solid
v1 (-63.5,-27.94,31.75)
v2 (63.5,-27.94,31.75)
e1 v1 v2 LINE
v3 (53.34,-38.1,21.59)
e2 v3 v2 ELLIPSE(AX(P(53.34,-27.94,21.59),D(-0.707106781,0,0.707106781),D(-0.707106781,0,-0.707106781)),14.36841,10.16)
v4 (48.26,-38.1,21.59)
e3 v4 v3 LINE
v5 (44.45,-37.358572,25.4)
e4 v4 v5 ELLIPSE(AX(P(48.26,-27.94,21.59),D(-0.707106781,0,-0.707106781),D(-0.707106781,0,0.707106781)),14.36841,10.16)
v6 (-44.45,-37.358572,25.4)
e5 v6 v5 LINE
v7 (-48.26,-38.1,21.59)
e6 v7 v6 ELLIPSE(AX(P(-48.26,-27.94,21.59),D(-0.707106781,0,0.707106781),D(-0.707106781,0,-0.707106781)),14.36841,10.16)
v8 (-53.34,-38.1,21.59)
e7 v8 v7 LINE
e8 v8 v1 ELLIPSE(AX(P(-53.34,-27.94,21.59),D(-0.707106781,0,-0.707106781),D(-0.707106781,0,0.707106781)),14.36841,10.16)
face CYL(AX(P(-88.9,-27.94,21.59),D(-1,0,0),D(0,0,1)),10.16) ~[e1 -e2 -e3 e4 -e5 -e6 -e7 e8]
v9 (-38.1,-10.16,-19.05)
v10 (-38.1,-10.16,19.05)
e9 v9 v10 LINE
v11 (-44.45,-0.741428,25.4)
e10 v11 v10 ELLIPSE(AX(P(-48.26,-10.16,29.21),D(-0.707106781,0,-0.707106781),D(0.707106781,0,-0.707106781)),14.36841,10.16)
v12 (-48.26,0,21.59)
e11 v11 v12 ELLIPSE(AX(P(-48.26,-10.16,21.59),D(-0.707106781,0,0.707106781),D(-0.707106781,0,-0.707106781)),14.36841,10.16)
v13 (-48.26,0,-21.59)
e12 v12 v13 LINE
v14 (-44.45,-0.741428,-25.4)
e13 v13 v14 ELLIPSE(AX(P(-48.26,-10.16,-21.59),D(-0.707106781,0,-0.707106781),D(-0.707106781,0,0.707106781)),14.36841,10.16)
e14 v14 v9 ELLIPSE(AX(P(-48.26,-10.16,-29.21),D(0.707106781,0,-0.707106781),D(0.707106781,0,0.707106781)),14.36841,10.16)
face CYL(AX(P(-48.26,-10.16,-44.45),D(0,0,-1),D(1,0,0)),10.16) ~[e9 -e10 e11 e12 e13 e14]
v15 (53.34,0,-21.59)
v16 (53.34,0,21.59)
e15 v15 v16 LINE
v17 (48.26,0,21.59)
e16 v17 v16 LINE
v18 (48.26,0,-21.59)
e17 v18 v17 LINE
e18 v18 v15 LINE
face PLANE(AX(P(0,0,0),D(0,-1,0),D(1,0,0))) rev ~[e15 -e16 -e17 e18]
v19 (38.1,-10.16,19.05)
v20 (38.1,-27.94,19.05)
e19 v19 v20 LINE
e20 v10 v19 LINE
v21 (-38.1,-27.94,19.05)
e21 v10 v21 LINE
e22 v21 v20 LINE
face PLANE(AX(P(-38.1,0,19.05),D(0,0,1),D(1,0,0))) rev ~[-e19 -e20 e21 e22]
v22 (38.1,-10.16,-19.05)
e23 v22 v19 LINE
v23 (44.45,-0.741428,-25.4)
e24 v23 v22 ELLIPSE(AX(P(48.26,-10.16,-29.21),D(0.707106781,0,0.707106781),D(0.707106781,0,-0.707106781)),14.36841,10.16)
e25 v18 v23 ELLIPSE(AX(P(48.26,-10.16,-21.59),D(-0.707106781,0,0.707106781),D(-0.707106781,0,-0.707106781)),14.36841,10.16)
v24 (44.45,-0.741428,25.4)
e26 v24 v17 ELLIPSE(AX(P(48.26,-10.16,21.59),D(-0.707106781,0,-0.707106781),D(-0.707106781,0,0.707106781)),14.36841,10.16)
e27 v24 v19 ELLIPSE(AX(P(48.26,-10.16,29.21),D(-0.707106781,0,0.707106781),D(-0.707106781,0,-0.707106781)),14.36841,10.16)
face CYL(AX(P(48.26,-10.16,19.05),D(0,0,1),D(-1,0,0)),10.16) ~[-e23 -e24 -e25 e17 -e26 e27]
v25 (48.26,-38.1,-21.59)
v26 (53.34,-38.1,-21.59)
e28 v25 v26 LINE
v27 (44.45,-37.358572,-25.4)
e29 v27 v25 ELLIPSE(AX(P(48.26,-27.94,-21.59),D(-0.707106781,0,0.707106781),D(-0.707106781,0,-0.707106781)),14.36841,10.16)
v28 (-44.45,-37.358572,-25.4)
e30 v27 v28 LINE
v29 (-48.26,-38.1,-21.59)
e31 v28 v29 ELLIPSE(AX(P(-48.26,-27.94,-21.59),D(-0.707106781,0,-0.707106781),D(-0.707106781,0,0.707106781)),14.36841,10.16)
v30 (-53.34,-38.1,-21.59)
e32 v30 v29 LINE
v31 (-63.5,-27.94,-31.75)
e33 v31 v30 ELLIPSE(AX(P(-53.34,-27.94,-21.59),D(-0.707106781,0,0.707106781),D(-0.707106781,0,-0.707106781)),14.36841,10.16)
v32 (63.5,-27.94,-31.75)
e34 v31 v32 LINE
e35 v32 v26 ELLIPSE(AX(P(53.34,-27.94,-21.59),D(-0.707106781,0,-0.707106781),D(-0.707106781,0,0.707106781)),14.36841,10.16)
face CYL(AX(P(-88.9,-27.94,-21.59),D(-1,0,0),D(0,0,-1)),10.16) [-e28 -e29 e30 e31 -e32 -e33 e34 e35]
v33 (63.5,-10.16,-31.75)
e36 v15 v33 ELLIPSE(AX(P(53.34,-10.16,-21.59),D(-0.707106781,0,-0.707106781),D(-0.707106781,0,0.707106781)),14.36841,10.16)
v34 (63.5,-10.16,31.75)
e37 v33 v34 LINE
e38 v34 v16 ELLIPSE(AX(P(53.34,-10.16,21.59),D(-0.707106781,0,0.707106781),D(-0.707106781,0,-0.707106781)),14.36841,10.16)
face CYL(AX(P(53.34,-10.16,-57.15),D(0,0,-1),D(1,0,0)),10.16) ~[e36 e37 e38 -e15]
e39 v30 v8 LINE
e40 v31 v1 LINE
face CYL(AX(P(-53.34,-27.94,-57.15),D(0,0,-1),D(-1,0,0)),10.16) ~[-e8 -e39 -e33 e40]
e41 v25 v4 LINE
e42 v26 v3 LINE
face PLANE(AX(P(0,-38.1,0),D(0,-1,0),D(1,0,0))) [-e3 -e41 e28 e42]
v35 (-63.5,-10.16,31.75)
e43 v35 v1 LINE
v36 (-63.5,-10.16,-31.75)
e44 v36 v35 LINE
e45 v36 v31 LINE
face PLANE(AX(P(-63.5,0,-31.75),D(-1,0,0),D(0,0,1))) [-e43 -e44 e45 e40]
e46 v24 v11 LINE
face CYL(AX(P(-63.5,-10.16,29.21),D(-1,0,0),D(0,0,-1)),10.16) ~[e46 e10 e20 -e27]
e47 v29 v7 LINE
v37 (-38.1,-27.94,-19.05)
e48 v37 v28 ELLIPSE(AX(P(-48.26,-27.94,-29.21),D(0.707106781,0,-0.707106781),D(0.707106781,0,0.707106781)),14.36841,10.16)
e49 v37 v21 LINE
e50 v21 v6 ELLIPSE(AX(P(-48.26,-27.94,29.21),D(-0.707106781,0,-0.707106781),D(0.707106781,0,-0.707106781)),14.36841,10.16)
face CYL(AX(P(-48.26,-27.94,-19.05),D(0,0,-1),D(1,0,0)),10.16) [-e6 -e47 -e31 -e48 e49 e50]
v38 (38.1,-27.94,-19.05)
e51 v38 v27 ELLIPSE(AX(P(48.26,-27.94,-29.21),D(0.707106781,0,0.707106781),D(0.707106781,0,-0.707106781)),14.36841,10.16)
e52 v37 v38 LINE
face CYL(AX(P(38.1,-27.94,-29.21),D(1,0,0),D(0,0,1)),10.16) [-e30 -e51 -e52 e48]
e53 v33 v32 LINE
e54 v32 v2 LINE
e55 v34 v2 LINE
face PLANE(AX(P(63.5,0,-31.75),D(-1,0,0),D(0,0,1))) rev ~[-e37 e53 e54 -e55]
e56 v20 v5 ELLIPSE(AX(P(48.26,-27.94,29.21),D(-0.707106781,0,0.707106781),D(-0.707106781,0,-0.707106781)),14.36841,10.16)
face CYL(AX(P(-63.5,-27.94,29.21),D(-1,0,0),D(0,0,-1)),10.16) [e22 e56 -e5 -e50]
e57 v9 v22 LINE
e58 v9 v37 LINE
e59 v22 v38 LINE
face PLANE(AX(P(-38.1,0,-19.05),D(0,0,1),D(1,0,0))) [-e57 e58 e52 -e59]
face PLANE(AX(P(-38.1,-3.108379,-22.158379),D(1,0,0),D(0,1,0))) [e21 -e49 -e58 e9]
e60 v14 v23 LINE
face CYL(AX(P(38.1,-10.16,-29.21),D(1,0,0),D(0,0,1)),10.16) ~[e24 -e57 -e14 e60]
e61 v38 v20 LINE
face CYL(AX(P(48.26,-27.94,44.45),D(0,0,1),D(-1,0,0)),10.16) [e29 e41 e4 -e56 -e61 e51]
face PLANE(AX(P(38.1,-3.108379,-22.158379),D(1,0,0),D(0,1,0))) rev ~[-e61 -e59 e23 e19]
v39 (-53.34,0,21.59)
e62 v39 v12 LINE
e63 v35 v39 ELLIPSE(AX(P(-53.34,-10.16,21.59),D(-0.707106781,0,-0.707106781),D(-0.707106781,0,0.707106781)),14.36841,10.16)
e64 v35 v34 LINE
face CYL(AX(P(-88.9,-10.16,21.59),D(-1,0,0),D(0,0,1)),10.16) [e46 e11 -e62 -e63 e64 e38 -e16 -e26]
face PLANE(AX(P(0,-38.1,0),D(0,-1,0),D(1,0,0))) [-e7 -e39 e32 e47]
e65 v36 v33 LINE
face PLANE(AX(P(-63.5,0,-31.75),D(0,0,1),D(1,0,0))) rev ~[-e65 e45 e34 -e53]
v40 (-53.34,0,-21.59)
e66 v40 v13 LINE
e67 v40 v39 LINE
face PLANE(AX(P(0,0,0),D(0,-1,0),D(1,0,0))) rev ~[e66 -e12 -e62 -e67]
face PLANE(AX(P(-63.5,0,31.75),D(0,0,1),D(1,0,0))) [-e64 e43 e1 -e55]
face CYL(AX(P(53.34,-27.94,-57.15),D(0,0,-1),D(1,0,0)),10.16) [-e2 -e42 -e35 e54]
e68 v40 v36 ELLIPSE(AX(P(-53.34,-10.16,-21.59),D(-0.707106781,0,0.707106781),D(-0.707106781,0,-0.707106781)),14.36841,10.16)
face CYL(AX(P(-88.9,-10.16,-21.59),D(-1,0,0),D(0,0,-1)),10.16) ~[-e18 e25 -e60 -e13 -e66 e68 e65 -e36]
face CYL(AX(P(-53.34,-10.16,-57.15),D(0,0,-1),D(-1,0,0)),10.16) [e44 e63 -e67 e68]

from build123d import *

# Parameters (mm, degrees)
F0_W          = 127
F0_H          = 63.5
F0_W_2        = 76.2
F0_H_2        = 38.1
F1_DEPTH      = 38.1
F2_T1_DEPTH   = 177.8
F2_T3_DEPTH   = 114.3
F2_T5_DEPTH   = 76.2
F2_T7_DEPTH   = 38.1
F2_T13_DEPTH  = 101.6
F2_T17_DEPTH  = 63.5
F2_T25_DEPTH  = 101.6
F2_T29_DEPTH  = 63.5
F2_T37_DEPTH  = 63.5
F2_T42_DEPTH  = 101.6
F2_T49_DEPTH  = 101.6
F2_T53_DEPTH  = 63.5
F2_T61_DEPTH  = 101.6
F2_T65_DEPTH  = 63.5
F2_T73_DEPTH  = 101.6
F2_T77_DEPTH  = 63.5
F2_T85_DEPTH  = 63.5
F2_T90_DEPTH  = 101.6
F2_T97_DEPTH  = 101.6
F2_T101_DEPTH = 63.5


# Not quite as in the source:
# - a fillet or chamfer that OpenCascade refuses, or shapes differently, is made with other operations: its cross-section is extruded or revolved along the edge and cut away or added


with BuildPart() as f1:
    # F0 (on Front) → F1 (new body)
    with BuildSketch(Plane.XZ):
        Rectangle(F0_W, F0_H)
        Rectangle(F0_W_2, F0_H_2, mode=Mode.SUBTRACT)
    extrude(amount=F1_DEPTH)

    # F2: fillet of radius 10.16 on 16 edges, made by hand

    # F2_s2 → F2_t1 (cut)
    with BuildSketch(Plane.YZ.offset(-88.9)):
        with BuildLine():
            ThreePointArc((-27.94, -31.75), (-35.1242048969, -28.7742048969), (-38.1, -21.59))
            Line((-38.1, -21.59), (-38.1, -31.75))
            Line((-38.1, -31.75), (-27.94, -31.75))
        make_face()
        with BuildLine():
            ThreePointArc((-27.94, 31.75), (-35.1242048969, 28.7742048969), (-38.1, 21.59))
            Line((-38.1, 21.59), (-38.1, 31.75))
            Line((-38.1, 31.75), (-27.94, 31.75))
        make_face()
        with BuildLine():
            ThreePointArc((-10.16, -31.75), (-2.9757951031, -28.7742048969), (0, -21.59))
            Line((0, -21.59), (0, -31.75))
            Line((0, -31.75), (-10.16, -31.75))
        make_face()
        with BuildLine():
            ThreePointArc((-10.16, 31.75), (-2.9757951031, 28.7742048969), (0, 21.59))
            Line((0, 21.59), (0, 31.75))
            Line((0, 31.75), (-10.16, 31.75))
        make_face()
    extrude(amount=F2_T1_DEPTH, mode=Mode.SUBTRACT)

    # F2_s4 → F2_t3 (cut)
    with BuildSketch(Plane.XY.offset(-57.15)):
        with BuildLine():
            ThreePointArc((63.5, -27.94), (60.5242048969, -35.1242048969), (53.34, -38.1))
            Line((53.34, -38.1), (63.5, -38.1))
            Line((63.5, -38.1), (63.5, -27.94))
        make_face()
        with BuildLine():
            ThreePointArc((-63.5, -27.94), (-60.5242048969, -35.1242048969), (-53.34, -38.1))
            Line((-53.34, -38.1), (-63.5, -38.1))
            Line((-63.5, -38.1), (-63.5, -27.94))
        make_face()
        with BuildLine():
            ThreePointArc((63.5, -10.16), (60.5242048969, -2.9757951031), (53.34, 0))
            Line((53.34, 0), (63.5, 0))
            Line((63.5, 0), (63.5, -10.16))
        make_face()
        with BuildLine():
            ThreePointArc((-63.5, -10.16), (-60.5242048969, -2.9757951031), (-53.34, 0))
            Line((-53.34, 0), (-63.5, 0))
            Line((-63.5, 0), (-63.5, -10.16))
        make_face()
    extrude(amount=F2_T3_DEPTH, mode=Mode.SUBTRACT)

    # F2_s6 → F2_t5 (cut)
    with BuildSketch(Plane.YZ.offset(-38.1)):
        with BuildLine():
            ThreePointArc((-27.94, -19.05), (-35.1242048969, -22.0257951031), (-38.1, -29.21))
            Line((-38.1, -29.21), (-38.1, -19.05))
            Line((-38.1, -19.05), (-27.94, -19.05))
        make_face()
        with BuildLine():
            ThreePointArc((-27.94, 19.05), (-35.1242048969, 22.0257951031), (-38.1, 29.21))
            Line((-38.1, 29.21), (-38.1, 19.05))
            Line((-38.1, 19.05), (-27.94, 19.05))
        make_face()
        with BuildLine():
            ThreePointArc((-10.16, -19.05), (-2.9757951031, -22.0257951031), (0, -29.21))
            Line((0, -29.21), (0, -19.05))
            Line((0, -19.05), (-10.16, -19.05))
        make_face()
        with BuildLine():
            ThreePointArc((-10.16, 19.05), (-2.9757951031, 22.0257951031), (0, 29.21))
            Line((0, 29.21), (0, 19.05))
            Line((0, 19.05), (-10.16, 19.05))
        make_face()
    extrude(amount=F2_T5_DEPTH, mode=Mode.SUBTRACT)

    # F2_s8 → F2_t7 (cut)
    with BuildSketch(Plane.XY.offset(-19.05)):
        with BuildLine():
            ThreePointArc((-38.1, -27.94), (-41.0757951031, -35.1242048969), (-48.26, -38.1))
            Line((-48.26, -38.1), (-38.1, -38.1))
            Line((-38.1, -38.1), (-38.1, -27.94))
        make_face()
        with BuildLine():
            ThreePointArc((38.1, -27.94), (41.0757951031, -35.1242048969), (48.26, -38.1))
            Line((48.26, -38.1), (38.1, -38.1))
            Line((38.1, -38.1), (38.1, -27.94))
        make_face()
        with BuildLine():
            ThreePointArc((-38.1, -10.16), (-41.0757951031, -2.9757951031), (-48.26, 0))
            Line((-48.26, 0), (-38.1, 0))
            Line((-38.1, 0), (-38.1, -10.16))
        make_face()
        with BuildLine():
            ThreePointArc((38.1, -10.16), (41.0757951031, -2.9757951031), (48.26, 0))
            Line((48.26, 0), (38.1, 0))
            Line((38.1, 0), (38.1, -10.16))
        make_face()
    extrude(amount=F2_T7_DEPTH, mode=Mode.SUBTRACT)


with BuildPart() as f2_tool11:
    # F2_s12 → F2_t13 (new body)
    with BuildSketch(Plane.YZ.offset(63.5)):
        with BuildLine():
            ThreePointArc((-27.94, -19.05), (-35.1242048969, -22.0257951031), (-38.1, -29.21))
            Line((-38.1, -29.21), (-38.1, -19.05))
            Line((-38.1, -19.05), (-27.94, -19.05))
        make_face()
    extrude(amount=-F2_T13_DEPTH)

    split(bisect_by=Plane.YZ.offset(38.1), keep=Keep.TOP)


with BuildPart() as f2_tool15:
    # F2_s16 → F2_t17 (new body)
    with BuildSketch(Plane.XY.offset(19.05)):
        with BuildLine():
            ThreePointArc((38.1, -27.94), (41.0757951031, -35.1242048969), (48.26, -38.1))
            Line((48.26, -38.1), (38.1, -38.1))
            Line((38.1, -38.1), (38.1, -27.94))
        make_face()
    extrude(amount=-F2_T17_DEPTH)

    split(bisect_by=Plane.XY.offset(-31.75), keep=Keep.TOP)

    split(bisect_by=Plane.XY.offset(-19.05), keep=Keep.BOTTOM)


with BuildPart() as f2_tool11_1:
    add(f2_tool11.part)

    # F2_t20: intersect F2_tool15
    add(f2_tool15.part, mode=Mode.INTERSECT)


with BuildPart() as f1_1:
    add(f1.part)

    # F2_t9: cut F2_tool11
    add(f2_tool11_1.part, mode=Mode.SUBTRACT)


with BuildPart() as f2_tool23:
    # F2_s24 → F2_t25 (new body)
    with BuildSketch(Plane.YZ.offset(38.1)):
        with BuildLine():
            ThreePointArc((-27.94, -19.05), (-35.1242048969, -22.0257951031), (-38.1, -29.21))
            Line((-38.1, -29.21), (-38.1, -19.05))
            Line((-38.1, -19.05), (-27.94, -19.05))
        make_face()
    extrude(amount=-F2_T25_DEPTH)

    split(bisect_by=Plane.YZ.offset(-38.1), keep=Keep.BOTTOM)


with BuildPart() as f2_tool27:
    # F2_s28 → F2_t29 (new body)
    with BuildSketch(Plane.XY.offset(-44.45)):
        with BuildLine():
            ThreePointArc((-38.1, -27.94), (-41.0757951031, -35.1242048969), (-48.26, -38.1))
            Line((-48.26, -38.1), (-38.1, -38.1))
            Line((-38.1, -38.1), (-38.1, -27.94))
        make_face()
    extrude(amount=F2_T29_DEPTH)

    split(bisect_by=Plane.XY.offset(-31.75), keep=Keep.TOP)

    split(bisect_by=Plane.XY.offset(-19.05), keep=Keep.BOTTOM)


with BuildPart() as f2_tool23_1:
    add(f2_tool23.part)

    # F2_t32: intersect F2_tool27
    add(f2_tool27.part, mode=Mode.INTERSECT)


with BuildPart() as f1_2:
    add(f1_1.part)

    # F2_t21: cut F2_tool23
    add(f2_tool23_1.part, mode=Mode.SUBTRACT)


with BuildPart() as f2_tool35:
    # F2_s36 → F2_t37 (new body)
    with BuildSketch(Plane.XY.offset(-19.05)):
        with BuildLine():
            ThreePointArc((-38.1, -27.94), (-41.0757951031, -35.1242048969), (-48.26, -38.1))
            Line((-48.26, -38.1), (-38.1, -38.1))
            Line((-38.1, -38.1), (-38.1, -27.94))
        make_face()
    extrude(amount=F2_T37_DEPTH)

    split(bisect_by=Plane.XY.offset(31.75), keep=Keep.BOTTOM)

    split(bisect_by=Plane.XY.offset(19.05), keep=Keep.TOP)


with BuildPart() as f2_tool40:
    # F2_s41 → F2_t42 (new body)
    with BuildSketch(Plane.YZ.offset(-63.5)):
        with BuildLine():
            ThreePointArc((-27.94, 19.05), (-35.1242048969, 22.0257951031), (-38.1, 29.21))
            Line((-38.1, 29.21), (-38.1, 19.05))
            Line((-38.1, 19.05), (-27.94, 19.05))
        make_face()
    extrude(amount=F2_T42_DEPTH)

    split(bisect_by=Plane.YZ.offset(-38.1), keep=Keep.BOTTOM)


with BuildPart() as f2_tool35_1:
    add(f2_tool35.part)

    # F2_t44: intersect F2_tool40
    add(f2_tool40.part, mode=Mode.INTERSECT)


with BuildPart() as f1_3:
    add(f1_2.part)

    # F2_t33: cut F2_tool35
    add(f2_tool35_1.part, mode=Mode.SUBTRACT)


with BuildPart() as f2_tool47:
    # F2_s48 → F2_t49 (new body)
    with BuildSketch(Plane.YZ.offset(-38.1)):
        with BuildLine():
            ThreePointArc((-27.94, 19.05), (-35.1242048969, 22.0257951031), (-38.1, 29.21))
            Line((-38.1, 29.21), (-38.1, 19.05))
            Line((-38.1, 19.05), (-27.94, 19.05))
        make_face()
    extrude(amount=F2_T49_DEPTH)

    split(bisect_by=Plane.YZ.offset(38.1), keep=Keep.TOP)


with BuildPart() as f2_tool51:
    # F2_s52 → F2_t53 (new body)
    with BuildSketch(Plane.XY.offset(44.45)):
        with BuildLine():
            ThreePointArc((38.1, -27.94), (41.0757951031, -35.1242048969), (48.26, -38.1))
            Line((48.26, -38.1), (38.1, -38.1))
            Line((38.1, -38.1), (38.1, -27.94))
        make_face()
    extrude(amount=-F2_T53_DEPTH)

    split(bisect_by=Plane.XY.offset(31.75), keep=Keep.BOTTOM)

    split(bisect_by=Plane.XY.offset(19.05), keep=Keep.TOP)


with BuildPart() as f2_tool47_1:
    add(f2_tool47.part)

    # F2_t56: intersect F2_tool51
    add(f2_tool51.part, mode=Mode.INTERSECT)


with BuildPart() as f1_4:
    add(f1_3.part)

    # F2_t45: cut F2_tool47
    add(f2_tool47_1.part, mode=Mode.SUBTRACT)


with BuildPart() as f2_tool59:
    # F2_s60 → F2_t61 (new body)
    with BuildSketch(Plane.YZ.offset(63.5)):
        with BuildLine():
            ThreePointArc((-10.16, -19.05), (-2.9757951031, -22.0257951031), (0, -29.21))
            Line((0, -29.21), (0, -19.05))
            Line((0, -19.05), (-10.16, -19.05))
        make_face()
    extrude(amount=-F2_T61_DEPTH)

    split(bisect_by=Plane.YZ.offset(38.1), keep=Keep.TOP)


with BuildPart() as f2_tool63:
    # F2_s64 → F2_t65 (new body)
    with BuildSketch(Plane.XY.offset(19.05)):
        with BuildLine():
            ThreePointArc((38.1, -10.16), (41.0757951031, -2.9757951031), (48.26, 0))
            Line((48.26, 0), (38.1, 0))
            Line((38.1, 0), (38.1, -10.16))
        make_face()
    extrude(amount=-F2_T65_DEPTH)

    split(bisect_by=Plane.XY.offset(-31.75), keep=Keep.TOP)

    split(bisect_by=Plane.XY.offset(-19.05), keep=Keep.BOTTOM)


with BuildPart() as f2_tool59_1:
    add(f2_tool59.part)

    # F2_t68: intersect F2_tool63
    add(f2_tool63.part, mode=Mode.INTERSECT)


with BuildPart() as f1_5:
    add(f1_4.part)

    # F2_t57: cut F2_tool59
    add(f2_tool59_1.part, mode=Mode.SUBTRACT)


with BuildPart() as f2_tool71:
    # F2_s72 → F2_t73 (new body)
    with BuildSketch(Plane.YZ.offset(38.1)):
        with BuildLine():
            ThreePointArc((-10.16, -19.05), (-2.9757951031, -22.0257951031), (0, -29.21))
            Line((0, -29.21), (0, -19.05))
            Line((0, -19.05), (-10.16, -19.05))
        make_face()
    extrude(amount=-F2_T73_DEPTH)

    split(bisect_by=Plane.YZ.offset(-38.1), keep=Keep.BOTTOM)


with BuildPart() as f2_tool75:
    # F2_s76 → F2_t77 (new body)
    with BuildSketch(Plane.XY.offset(-44.45)):
        with BuildLine():
            ThreePointArc((-38.1, -10.16), (-41.0757951031, -2.9757951031), (-48.26, 0))
            Line((-48.26, 0), (-38.1, 0))
            Line((-38.1, 0), (-38.1, -10.16))
        make_face()
    extrude(amount=F2_T77_DEPTH)

    split(bisect_by=Plane.XY.offset(-31.75), keep=Keep.TOP)

    split(bisect_by=Plane.XY.offset(-19.05), keep=Keep.BOTTOM)


with BuildPart() as f2_tool71_1:
    add(f2_tool71.part)

    # F2_t80: intersect F2_tool75
    add(f2_tool75.part, mode=Mode.INTERSECT)


with BuildPart() as f1_6:
    add(f1_5.part)

    # F2_t69: cut F2_tool71
    add(f2_tool71_1.part, mode=Mode.SUBTRACT)


with BuildPart() as f2_tool83:
    # F2_s84 → F2_t85 (new body)
    with BuildSketch(Plane.XY.offset(-19.05)):
        with BuildLine():
            ThreePointArc((-38.1, -10.16), (-41.0757951031, -2.9757951031), (-48.26, 0))
            Line((-48.26, 0), (-38.1, 0))
            Line((-38.1, 0), (-38.1, -10.16))
        make_face()
    extrude(amount=F2_T85_DEPTH)

    split(bisect_by=Plane.XY.offset(31.75), keep=Keep.BOTTOM)

    split(bisect_by=Plane.XY.offset(19.05), keep=Keep.TOP)


with BuildPart() as f2_tool88:
    # F2_s89 → F2_t90 (new body)
    with BuildSketch(Plane.YZ.offset(-63.5)):
        with BuildLine():
            ThreePointArc((-10.16, 19.05), (-2.9757951031, 22.0257951031), (0, 29.21))
            Line((0, 29.21), (0, 19.05))
            Line((0, 19.05), (-10.16, 19.05))
        make_face()
    extrude(amount=F2_T90_DEPTH)

    split(bisect_by=Plane.YZ.offset(-38.1), keep=Keep.BOTTOM)


with BuildPart() as f2_tool83_1:
    add(f2_tool83.part)

    # F2_t92: intersect F2_tool88
    add(f2_tool88.part, mode=Mode.INTERSECT)


with BuildPart() as f1_7:
    add(f1_6.part)

    # F2_t81: cut F2_tool83
    add(f2_tool83_1.part, mode=Mode.SUBTRACT)


with BuildPart() as f2_tool95:
    # F2_s96 → F2_t97 (new body)
    with BuildSketch(Plane.YZ.offset(-38.1)):
        with BuildLine():
            ThreePointArc((-10.16, 19.05), (-2.9757951031, 22.0257951031), (0, 29.21))
            Line((0, 29.21), (0, 19.05))
            Line((0, 19.05), (-10.16, 19.05))
        make_face()
    extrude(amount=F2_T97_DEPTH)

    split(bisect_by=Plane.YZ.offset(38.1), keep=Keep.TOP)


with BuildPart() as f2_tool99:
    # F2_s100 → F2_t101 (new body)
    with BuildSketch(Plane.XY.offset(44.45)):
        with BuildLine():
            ThreePointArc((38.1, -10.16), (41.0757951031, -2.9757951031), (48.26, 0))
            Line((48.26, 0), (38.1, 0))
            Line((38.1, 0), (38.1, -10.16))
        make_face()
    extrude(amount=-F2_T101_DEPTH)

    split(bisect_by=Plane.XY.offset(31.75), keep=Keep.BOTTOM)

    split(bisect_by=Plane.XY.offset(19.05), keep=Keep.TOP)


with BuildPart() as f2_tool95_1:
    add(f2_tool95.part)

    # F2_t104: intersect F2_tool99
    add(f2_tool99.part, mode=Mode.INTERSECT)


with BuildPart() as f1_8:
    add(f1_7.part)

    # F2_t93: cut F2_tool95
    add(f2_tool95_1.part, mode=Mode.SUBTRACT)


solid = f1_8.part
